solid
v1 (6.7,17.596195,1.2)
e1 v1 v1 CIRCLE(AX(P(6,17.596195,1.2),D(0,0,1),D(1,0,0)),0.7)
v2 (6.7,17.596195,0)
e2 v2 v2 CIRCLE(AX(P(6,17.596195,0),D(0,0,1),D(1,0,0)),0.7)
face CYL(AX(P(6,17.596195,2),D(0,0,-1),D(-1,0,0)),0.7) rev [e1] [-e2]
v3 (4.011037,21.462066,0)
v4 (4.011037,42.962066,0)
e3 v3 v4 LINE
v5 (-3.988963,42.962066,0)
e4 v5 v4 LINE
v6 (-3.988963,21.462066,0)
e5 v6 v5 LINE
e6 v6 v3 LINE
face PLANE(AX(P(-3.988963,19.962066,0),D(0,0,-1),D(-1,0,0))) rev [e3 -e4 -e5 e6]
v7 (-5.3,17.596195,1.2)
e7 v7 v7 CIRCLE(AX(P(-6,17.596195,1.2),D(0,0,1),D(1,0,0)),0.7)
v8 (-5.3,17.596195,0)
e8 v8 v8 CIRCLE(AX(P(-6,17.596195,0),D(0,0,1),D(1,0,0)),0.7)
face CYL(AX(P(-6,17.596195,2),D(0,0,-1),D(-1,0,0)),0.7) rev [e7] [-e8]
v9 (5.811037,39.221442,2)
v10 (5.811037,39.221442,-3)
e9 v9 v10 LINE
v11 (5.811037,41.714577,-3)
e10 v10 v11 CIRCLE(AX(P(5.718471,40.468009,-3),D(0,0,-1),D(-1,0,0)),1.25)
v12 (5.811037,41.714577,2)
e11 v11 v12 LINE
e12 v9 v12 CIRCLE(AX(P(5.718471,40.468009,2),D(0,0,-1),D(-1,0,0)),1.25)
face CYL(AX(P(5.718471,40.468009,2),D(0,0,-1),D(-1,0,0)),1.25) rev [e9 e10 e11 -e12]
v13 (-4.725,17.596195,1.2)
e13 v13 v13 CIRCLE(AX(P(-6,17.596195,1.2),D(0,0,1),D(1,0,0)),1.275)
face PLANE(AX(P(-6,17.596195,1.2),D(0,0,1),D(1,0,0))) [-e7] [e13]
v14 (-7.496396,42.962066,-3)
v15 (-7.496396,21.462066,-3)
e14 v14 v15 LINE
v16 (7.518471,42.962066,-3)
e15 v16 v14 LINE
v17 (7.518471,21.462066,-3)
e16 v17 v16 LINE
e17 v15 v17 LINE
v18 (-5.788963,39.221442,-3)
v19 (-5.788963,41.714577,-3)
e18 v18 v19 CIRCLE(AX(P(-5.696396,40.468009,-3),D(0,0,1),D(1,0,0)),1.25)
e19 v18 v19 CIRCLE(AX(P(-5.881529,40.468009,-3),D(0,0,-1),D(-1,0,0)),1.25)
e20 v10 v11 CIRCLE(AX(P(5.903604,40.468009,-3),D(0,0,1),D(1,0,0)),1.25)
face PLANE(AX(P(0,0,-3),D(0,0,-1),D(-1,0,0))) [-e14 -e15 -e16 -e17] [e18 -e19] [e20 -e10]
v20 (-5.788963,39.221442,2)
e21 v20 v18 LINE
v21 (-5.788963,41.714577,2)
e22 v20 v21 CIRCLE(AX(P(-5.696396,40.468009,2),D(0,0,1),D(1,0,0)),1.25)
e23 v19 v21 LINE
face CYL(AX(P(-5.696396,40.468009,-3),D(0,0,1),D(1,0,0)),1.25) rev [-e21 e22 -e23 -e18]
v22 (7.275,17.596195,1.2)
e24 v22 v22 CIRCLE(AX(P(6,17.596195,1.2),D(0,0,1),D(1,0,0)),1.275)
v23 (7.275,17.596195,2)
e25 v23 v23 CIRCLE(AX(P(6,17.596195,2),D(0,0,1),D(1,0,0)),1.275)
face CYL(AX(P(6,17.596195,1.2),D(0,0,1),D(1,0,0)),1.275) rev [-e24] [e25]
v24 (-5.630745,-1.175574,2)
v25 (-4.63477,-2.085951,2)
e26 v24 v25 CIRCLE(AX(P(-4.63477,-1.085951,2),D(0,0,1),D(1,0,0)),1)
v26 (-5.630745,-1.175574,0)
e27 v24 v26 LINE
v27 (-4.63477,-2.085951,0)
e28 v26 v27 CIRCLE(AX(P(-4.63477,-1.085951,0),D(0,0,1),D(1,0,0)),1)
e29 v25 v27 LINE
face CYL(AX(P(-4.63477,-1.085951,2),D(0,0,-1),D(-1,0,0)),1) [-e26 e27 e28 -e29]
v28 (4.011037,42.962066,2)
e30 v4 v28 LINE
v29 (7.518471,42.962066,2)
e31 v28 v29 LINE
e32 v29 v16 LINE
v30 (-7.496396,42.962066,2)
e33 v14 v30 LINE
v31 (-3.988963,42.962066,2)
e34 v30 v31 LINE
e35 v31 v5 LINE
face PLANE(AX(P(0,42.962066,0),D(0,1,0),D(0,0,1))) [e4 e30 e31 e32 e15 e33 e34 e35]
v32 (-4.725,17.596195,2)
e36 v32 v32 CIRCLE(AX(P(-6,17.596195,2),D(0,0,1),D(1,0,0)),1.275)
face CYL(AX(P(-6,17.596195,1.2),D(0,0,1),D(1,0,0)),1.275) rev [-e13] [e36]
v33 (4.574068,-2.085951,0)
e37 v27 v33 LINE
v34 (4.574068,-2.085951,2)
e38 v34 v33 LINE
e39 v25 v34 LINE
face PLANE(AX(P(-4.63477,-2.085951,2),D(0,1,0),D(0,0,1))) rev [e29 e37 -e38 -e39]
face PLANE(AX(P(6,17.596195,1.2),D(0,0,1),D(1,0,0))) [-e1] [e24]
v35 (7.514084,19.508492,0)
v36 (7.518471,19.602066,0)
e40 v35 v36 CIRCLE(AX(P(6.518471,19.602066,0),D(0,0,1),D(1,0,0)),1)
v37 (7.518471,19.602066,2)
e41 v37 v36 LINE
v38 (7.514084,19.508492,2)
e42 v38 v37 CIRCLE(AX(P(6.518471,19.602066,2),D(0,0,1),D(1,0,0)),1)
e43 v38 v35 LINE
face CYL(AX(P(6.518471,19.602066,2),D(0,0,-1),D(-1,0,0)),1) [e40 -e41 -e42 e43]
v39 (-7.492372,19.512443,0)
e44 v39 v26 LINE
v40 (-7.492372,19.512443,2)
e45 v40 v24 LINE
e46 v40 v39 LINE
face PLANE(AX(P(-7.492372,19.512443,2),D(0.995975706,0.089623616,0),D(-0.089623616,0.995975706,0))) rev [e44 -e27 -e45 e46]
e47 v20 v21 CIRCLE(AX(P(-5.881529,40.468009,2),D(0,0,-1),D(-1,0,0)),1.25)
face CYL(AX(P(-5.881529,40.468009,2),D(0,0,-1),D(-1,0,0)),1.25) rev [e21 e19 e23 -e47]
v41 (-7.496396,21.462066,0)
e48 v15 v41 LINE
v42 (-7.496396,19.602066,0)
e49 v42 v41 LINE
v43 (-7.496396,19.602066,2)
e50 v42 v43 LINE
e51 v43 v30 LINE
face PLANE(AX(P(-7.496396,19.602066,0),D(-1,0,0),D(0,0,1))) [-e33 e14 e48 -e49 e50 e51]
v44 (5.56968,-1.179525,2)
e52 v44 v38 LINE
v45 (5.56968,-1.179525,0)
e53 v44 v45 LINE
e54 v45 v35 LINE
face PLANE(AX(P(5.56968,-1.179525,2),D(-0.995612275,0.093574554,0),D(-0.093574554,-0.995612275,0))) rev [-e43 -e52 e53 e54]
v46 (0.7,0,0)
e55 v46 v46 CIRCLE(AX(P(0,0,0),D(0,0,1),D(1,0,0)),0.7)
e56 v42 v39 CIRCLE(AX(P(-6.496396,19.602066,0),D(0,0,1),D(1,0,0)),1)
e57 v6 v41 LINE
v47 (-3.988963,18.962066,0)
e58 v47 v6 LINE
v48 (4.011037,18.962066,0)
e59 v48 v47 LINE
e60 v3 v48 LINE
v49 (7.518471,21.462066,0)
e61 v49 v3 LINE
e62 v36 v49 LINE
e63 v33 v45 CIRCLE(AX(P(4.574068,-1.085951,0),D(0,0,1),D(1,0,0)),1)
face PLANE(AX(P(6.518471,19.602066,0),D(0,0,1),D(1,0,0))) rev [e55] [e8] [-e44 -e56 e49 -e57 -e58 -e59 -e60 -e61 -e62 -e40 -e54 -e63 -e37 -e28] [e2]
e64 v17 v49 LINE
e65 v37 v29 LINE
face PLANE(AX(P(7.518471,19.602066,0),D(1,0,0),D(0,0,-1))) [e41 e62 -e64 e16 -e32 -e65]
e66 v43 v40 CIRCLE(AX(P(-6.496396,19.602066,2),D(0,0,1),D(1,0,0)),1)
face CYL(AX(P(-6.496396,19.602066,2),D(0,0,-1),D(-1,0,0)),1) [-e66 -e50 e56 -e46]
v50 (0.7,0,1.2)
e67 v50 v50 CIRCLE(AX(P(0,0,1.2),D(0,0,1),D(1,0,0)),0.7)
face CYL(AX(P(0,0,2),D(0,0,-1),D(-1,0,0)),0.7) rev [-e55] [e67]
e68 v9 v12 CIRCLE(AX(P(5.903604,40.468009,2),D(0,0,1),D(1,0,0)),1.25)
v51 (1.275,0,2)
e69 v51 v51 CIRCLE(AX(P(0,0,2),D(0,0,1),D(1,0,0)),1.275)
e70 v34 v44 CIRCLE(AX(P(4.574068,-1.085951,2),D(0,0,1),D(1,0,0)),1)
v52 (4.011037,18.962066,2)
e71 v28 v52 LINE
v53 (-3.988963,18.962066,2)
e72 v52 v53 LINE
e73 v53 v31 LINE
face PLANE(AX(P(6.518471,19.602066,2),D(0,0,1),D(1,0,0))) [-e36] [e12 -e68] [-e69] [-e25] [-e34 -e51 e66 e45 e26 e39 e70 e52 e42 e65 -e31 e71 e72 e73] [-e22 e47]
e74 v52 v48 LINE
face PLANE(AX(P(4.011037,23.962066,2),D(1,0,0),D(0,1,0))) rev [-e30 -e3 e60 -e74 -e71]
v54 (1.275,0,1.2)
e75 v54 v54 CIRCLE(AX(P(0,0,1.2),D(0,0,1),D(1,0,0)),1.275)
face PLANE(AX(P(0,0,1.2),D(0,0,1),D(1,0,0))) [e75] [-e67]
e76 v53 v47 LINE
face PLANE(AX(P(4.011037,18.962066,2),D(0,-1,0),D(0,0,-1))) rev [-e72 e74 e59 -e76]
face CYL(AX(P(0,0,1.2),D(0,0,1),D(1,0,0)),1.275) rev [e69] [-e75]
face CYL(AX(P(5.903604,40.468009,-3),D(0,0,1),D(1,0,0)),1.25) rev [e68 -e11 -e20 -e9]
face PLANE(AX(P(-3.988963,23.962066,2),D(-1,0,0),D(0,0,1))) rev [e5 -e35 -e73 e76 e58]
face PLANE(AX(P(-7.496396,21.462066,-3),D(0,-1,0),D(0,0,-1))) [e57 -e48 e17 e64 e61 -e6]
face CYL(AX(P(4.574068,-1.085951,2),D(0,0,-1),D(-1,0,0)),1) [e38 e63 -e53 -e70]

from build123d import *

# Parameters (mm, degrees)
BOSS_EXTRUDE1_OUTLINE_R  = 0.7
BOSS_EXTRUDE1_DEPTH      = 2
BOSS_EXTRUDE2_DEPTH      = 0.86
BOSS_EXTRUDE2_DEPTH_BACK = 1
SKETCH2_W                = 15.014867696
SKETCH2_H                = 2
SKETCH3_W                = 8
SKETCH3_H                = 5
CUT_EXTRUDE1_DEPTH       = 23.82865975
SKETCH4_W                = 15.014867696
SKETCH4_H                = 1.5
BOSS_EXTRUDE3_DEPTH      = 5
SKETCH5_W                = 8
SKETCH5_H                = 4
CUT_EXTRUDE2_DEPTH       = 3
BOSS_EXTRUDE5_DEPTH      = 20
SKETCH9_R                = 1.275
CUT_EXTRUDE3_DEPTH       = 0.8
HOLE1_START              = -3
HOLE1_OUTLINE_R          = 1.25
HOLE1_DEPTH              = 5
HOLE2_START              = -3
HOLE2_DEPTH              = 5


# Read off the part's stored shape, not the designer's step: Boss-Extrude1, Hole1, Hole2
with BuildPart() as part:
    # Boss-Extrude1 outline → Boss-Extrude1 (new body)
    with BuildSketch(Plane.XY):
        with BuildLine():
            ThreePointArc((7.514083588, 19.508491868), (7.257921972, 20.275277178), (6.518471313, 20.602066422))
            Line((6.518471313, 20.602066422), (-6.496396384, 20.602066422))
            ThreePointArc((-6.496396384, 20.602066422), (-7.234510066, 20.276742783), (-7.49237209, 19.512442807))
            Line((-7.49237209, 19.512442807), (-5.630745451, -1.175574425))
            ThreePointArc((-5.630745451, -1.175574425), (-5.309446106, -1.824064491), (-4.634769745, -2.085950809))
            Line((-4.634769745, -2.085950809), (4.574067822, -2.085950809))
            ThreePointArc((4.574067822, -2.085950809), (5.247278579, -1.825401468), (5.569680097, -1.179525363))
            Line((5.569680097, -1.179525363), (7.514083588, 19.508491868))
        make_face()
        Circle(BOSS_EXTRUDE1_OUTLINE_R, mode=Mode.SUBTRACT)
        with Locations((-5.999999992, 17.596194699)):
            Circle(BOSS_EXTRUDE1_OUTLINE_R, mode=Mode.SUBTRACT)
        with Locations((6.000000016, 17.596194697)):
            Circle(BOSS_EXTRUDE1_OUTLINE_R, mode=Mode.SUBTRACT)
    extrude(amount=BOSS_EXTRUDE1_DEPTH)

    # Sketch2 → Boss-Extrude2 (add, two sides: drawn at the far end of the back side and taken through both)
    with BuildSketch(Plane(origin=(0, 20.602066422, 0), x_dir=(1, 0, 0), z_dir=(0, 1, 0)).offset(-BOSS_EXTRUDE2_DEPTH_BACK)):
        with Locations((0.011037464, -1)):
            Rectangle(SKETCH2_W, SKETCH2_H)
    extrude(amount=BOSS_EXTRUDE2_DEPTH + BOSS_EXTRUDE2_DEPTH_BACK)

    # Sketch3 → Cut-Extrude1 (cut, through all)
    with BuildSketch(Plane(origin=(0, 0, 0), x_dir=(-1, 0, 0), z_dir=(0, 0, -1))):
        with Locations((-0.011037464, 21.462066422)):
            Rectangle(SKETCH3_W, SKETCH3_H)
    extrude(amount=-CUT_EXTRUDE1_DEPTH, mode=Mode.SUBTRACT)

    # Sketch4 → Boss-Extrude3 (add)
    with BuildSketch(Plane.XY.offset(2)):
        with Locations((0.011037464, 22.212066422)):
            Rectangle(SKETCH4_W, SKETCH4_H)
    extrude(amount=-BOSS_EXTRUDE3_DEPTH)

    # Sketch5 → Cut-Extrude2 (cut)
    with BuildSketch(Plane(origin=(0, 22.962066422, 0), x_dir=(1, 0, 0), z_dir=(0, 1, 0))):
        with Locations((0.011037464, -2)):
            Rectangle(SKETCH5_W, SKETCH5_H)
    extrude(amount=-CUT_EXTRUDE2_DEPTH, mode=Mode.SUBTRACT)

    # Sketch6 → Boss-Extrude5 (add)
    with BuildSketch(Plane(origin=(0, 22.962066422, 0), x_dir=(1, 0, 0), z_dir=(0, 1, 0))):
        Polygon((-3.988962536, 0), (4.011037464, 0), (4.011037464, -2), (7.518471312, -2), (7.518471312, 3), (-7.496396384, 3), (-7.496396384, -2), (-3.988962536, -2), align=None)
    extrude(amount=BOSS_EXTRUDE5_DEPTH)

    # Sketch9 → Cut-Extrude3 (cut)
    with BuildSketch(Plane.XY.offset(2)):
        with Locations((-5.999999992, 17.596194699)):
            Circle(SKETCH9_R)
        with Locations((6.000000016, 17.596194697)):
            Circle(SKETCH9_R)
        Circle(SKETCH9_R)
    extrude(amount=-CUT_EXTRUDE3_DEPTH, mode=Mode.SUBTRACT)

    # Hole1 outline → Hole1 (cut)
    with BuildSketch(Plane.XY.offset(HOLE1_START)):
        with Locations((-5.881528688, 40.468009485)):
            Circle(HOLE1_OUTLINE_R)
        with Locations((5.718471312, 40.468009485)):
            Circle(HOLE1_OUTLINE_R)
    extrude(amount=HOLE1_DEPTH, mode=Mode.SUBTRACT)

    # Hole2 outline → Hole2 (cut)
    with BuildSketch(Plane.XY.offset(HOLE2_START)):
        with BuildLine():
            ThreePointArc((5.811037464, 41.714577376), (6.968471312, 40.468009485), (5.811037464, 39.221441594))
            ThreePointArc((5.811037464, 39.221441594), (7.153603616, 40.468009485), (5.811037464, 41.714577376))
        make_face()
        with BuildLine():
            ThreePointArc((-5.788962536, 41.714577376), (-4.631528688, 40.468009485), (-5.788962536, 39.221441594))
            ThreePointArc((-5.788962536, 39.221441594), (-4.446396384, 40.468009485), (-5.788962536, 41.714577376))
        make_face()
    extrude(amount=HOLE2_DEPTH, mode=Mode.SUBTRACT)


solid = part.part
